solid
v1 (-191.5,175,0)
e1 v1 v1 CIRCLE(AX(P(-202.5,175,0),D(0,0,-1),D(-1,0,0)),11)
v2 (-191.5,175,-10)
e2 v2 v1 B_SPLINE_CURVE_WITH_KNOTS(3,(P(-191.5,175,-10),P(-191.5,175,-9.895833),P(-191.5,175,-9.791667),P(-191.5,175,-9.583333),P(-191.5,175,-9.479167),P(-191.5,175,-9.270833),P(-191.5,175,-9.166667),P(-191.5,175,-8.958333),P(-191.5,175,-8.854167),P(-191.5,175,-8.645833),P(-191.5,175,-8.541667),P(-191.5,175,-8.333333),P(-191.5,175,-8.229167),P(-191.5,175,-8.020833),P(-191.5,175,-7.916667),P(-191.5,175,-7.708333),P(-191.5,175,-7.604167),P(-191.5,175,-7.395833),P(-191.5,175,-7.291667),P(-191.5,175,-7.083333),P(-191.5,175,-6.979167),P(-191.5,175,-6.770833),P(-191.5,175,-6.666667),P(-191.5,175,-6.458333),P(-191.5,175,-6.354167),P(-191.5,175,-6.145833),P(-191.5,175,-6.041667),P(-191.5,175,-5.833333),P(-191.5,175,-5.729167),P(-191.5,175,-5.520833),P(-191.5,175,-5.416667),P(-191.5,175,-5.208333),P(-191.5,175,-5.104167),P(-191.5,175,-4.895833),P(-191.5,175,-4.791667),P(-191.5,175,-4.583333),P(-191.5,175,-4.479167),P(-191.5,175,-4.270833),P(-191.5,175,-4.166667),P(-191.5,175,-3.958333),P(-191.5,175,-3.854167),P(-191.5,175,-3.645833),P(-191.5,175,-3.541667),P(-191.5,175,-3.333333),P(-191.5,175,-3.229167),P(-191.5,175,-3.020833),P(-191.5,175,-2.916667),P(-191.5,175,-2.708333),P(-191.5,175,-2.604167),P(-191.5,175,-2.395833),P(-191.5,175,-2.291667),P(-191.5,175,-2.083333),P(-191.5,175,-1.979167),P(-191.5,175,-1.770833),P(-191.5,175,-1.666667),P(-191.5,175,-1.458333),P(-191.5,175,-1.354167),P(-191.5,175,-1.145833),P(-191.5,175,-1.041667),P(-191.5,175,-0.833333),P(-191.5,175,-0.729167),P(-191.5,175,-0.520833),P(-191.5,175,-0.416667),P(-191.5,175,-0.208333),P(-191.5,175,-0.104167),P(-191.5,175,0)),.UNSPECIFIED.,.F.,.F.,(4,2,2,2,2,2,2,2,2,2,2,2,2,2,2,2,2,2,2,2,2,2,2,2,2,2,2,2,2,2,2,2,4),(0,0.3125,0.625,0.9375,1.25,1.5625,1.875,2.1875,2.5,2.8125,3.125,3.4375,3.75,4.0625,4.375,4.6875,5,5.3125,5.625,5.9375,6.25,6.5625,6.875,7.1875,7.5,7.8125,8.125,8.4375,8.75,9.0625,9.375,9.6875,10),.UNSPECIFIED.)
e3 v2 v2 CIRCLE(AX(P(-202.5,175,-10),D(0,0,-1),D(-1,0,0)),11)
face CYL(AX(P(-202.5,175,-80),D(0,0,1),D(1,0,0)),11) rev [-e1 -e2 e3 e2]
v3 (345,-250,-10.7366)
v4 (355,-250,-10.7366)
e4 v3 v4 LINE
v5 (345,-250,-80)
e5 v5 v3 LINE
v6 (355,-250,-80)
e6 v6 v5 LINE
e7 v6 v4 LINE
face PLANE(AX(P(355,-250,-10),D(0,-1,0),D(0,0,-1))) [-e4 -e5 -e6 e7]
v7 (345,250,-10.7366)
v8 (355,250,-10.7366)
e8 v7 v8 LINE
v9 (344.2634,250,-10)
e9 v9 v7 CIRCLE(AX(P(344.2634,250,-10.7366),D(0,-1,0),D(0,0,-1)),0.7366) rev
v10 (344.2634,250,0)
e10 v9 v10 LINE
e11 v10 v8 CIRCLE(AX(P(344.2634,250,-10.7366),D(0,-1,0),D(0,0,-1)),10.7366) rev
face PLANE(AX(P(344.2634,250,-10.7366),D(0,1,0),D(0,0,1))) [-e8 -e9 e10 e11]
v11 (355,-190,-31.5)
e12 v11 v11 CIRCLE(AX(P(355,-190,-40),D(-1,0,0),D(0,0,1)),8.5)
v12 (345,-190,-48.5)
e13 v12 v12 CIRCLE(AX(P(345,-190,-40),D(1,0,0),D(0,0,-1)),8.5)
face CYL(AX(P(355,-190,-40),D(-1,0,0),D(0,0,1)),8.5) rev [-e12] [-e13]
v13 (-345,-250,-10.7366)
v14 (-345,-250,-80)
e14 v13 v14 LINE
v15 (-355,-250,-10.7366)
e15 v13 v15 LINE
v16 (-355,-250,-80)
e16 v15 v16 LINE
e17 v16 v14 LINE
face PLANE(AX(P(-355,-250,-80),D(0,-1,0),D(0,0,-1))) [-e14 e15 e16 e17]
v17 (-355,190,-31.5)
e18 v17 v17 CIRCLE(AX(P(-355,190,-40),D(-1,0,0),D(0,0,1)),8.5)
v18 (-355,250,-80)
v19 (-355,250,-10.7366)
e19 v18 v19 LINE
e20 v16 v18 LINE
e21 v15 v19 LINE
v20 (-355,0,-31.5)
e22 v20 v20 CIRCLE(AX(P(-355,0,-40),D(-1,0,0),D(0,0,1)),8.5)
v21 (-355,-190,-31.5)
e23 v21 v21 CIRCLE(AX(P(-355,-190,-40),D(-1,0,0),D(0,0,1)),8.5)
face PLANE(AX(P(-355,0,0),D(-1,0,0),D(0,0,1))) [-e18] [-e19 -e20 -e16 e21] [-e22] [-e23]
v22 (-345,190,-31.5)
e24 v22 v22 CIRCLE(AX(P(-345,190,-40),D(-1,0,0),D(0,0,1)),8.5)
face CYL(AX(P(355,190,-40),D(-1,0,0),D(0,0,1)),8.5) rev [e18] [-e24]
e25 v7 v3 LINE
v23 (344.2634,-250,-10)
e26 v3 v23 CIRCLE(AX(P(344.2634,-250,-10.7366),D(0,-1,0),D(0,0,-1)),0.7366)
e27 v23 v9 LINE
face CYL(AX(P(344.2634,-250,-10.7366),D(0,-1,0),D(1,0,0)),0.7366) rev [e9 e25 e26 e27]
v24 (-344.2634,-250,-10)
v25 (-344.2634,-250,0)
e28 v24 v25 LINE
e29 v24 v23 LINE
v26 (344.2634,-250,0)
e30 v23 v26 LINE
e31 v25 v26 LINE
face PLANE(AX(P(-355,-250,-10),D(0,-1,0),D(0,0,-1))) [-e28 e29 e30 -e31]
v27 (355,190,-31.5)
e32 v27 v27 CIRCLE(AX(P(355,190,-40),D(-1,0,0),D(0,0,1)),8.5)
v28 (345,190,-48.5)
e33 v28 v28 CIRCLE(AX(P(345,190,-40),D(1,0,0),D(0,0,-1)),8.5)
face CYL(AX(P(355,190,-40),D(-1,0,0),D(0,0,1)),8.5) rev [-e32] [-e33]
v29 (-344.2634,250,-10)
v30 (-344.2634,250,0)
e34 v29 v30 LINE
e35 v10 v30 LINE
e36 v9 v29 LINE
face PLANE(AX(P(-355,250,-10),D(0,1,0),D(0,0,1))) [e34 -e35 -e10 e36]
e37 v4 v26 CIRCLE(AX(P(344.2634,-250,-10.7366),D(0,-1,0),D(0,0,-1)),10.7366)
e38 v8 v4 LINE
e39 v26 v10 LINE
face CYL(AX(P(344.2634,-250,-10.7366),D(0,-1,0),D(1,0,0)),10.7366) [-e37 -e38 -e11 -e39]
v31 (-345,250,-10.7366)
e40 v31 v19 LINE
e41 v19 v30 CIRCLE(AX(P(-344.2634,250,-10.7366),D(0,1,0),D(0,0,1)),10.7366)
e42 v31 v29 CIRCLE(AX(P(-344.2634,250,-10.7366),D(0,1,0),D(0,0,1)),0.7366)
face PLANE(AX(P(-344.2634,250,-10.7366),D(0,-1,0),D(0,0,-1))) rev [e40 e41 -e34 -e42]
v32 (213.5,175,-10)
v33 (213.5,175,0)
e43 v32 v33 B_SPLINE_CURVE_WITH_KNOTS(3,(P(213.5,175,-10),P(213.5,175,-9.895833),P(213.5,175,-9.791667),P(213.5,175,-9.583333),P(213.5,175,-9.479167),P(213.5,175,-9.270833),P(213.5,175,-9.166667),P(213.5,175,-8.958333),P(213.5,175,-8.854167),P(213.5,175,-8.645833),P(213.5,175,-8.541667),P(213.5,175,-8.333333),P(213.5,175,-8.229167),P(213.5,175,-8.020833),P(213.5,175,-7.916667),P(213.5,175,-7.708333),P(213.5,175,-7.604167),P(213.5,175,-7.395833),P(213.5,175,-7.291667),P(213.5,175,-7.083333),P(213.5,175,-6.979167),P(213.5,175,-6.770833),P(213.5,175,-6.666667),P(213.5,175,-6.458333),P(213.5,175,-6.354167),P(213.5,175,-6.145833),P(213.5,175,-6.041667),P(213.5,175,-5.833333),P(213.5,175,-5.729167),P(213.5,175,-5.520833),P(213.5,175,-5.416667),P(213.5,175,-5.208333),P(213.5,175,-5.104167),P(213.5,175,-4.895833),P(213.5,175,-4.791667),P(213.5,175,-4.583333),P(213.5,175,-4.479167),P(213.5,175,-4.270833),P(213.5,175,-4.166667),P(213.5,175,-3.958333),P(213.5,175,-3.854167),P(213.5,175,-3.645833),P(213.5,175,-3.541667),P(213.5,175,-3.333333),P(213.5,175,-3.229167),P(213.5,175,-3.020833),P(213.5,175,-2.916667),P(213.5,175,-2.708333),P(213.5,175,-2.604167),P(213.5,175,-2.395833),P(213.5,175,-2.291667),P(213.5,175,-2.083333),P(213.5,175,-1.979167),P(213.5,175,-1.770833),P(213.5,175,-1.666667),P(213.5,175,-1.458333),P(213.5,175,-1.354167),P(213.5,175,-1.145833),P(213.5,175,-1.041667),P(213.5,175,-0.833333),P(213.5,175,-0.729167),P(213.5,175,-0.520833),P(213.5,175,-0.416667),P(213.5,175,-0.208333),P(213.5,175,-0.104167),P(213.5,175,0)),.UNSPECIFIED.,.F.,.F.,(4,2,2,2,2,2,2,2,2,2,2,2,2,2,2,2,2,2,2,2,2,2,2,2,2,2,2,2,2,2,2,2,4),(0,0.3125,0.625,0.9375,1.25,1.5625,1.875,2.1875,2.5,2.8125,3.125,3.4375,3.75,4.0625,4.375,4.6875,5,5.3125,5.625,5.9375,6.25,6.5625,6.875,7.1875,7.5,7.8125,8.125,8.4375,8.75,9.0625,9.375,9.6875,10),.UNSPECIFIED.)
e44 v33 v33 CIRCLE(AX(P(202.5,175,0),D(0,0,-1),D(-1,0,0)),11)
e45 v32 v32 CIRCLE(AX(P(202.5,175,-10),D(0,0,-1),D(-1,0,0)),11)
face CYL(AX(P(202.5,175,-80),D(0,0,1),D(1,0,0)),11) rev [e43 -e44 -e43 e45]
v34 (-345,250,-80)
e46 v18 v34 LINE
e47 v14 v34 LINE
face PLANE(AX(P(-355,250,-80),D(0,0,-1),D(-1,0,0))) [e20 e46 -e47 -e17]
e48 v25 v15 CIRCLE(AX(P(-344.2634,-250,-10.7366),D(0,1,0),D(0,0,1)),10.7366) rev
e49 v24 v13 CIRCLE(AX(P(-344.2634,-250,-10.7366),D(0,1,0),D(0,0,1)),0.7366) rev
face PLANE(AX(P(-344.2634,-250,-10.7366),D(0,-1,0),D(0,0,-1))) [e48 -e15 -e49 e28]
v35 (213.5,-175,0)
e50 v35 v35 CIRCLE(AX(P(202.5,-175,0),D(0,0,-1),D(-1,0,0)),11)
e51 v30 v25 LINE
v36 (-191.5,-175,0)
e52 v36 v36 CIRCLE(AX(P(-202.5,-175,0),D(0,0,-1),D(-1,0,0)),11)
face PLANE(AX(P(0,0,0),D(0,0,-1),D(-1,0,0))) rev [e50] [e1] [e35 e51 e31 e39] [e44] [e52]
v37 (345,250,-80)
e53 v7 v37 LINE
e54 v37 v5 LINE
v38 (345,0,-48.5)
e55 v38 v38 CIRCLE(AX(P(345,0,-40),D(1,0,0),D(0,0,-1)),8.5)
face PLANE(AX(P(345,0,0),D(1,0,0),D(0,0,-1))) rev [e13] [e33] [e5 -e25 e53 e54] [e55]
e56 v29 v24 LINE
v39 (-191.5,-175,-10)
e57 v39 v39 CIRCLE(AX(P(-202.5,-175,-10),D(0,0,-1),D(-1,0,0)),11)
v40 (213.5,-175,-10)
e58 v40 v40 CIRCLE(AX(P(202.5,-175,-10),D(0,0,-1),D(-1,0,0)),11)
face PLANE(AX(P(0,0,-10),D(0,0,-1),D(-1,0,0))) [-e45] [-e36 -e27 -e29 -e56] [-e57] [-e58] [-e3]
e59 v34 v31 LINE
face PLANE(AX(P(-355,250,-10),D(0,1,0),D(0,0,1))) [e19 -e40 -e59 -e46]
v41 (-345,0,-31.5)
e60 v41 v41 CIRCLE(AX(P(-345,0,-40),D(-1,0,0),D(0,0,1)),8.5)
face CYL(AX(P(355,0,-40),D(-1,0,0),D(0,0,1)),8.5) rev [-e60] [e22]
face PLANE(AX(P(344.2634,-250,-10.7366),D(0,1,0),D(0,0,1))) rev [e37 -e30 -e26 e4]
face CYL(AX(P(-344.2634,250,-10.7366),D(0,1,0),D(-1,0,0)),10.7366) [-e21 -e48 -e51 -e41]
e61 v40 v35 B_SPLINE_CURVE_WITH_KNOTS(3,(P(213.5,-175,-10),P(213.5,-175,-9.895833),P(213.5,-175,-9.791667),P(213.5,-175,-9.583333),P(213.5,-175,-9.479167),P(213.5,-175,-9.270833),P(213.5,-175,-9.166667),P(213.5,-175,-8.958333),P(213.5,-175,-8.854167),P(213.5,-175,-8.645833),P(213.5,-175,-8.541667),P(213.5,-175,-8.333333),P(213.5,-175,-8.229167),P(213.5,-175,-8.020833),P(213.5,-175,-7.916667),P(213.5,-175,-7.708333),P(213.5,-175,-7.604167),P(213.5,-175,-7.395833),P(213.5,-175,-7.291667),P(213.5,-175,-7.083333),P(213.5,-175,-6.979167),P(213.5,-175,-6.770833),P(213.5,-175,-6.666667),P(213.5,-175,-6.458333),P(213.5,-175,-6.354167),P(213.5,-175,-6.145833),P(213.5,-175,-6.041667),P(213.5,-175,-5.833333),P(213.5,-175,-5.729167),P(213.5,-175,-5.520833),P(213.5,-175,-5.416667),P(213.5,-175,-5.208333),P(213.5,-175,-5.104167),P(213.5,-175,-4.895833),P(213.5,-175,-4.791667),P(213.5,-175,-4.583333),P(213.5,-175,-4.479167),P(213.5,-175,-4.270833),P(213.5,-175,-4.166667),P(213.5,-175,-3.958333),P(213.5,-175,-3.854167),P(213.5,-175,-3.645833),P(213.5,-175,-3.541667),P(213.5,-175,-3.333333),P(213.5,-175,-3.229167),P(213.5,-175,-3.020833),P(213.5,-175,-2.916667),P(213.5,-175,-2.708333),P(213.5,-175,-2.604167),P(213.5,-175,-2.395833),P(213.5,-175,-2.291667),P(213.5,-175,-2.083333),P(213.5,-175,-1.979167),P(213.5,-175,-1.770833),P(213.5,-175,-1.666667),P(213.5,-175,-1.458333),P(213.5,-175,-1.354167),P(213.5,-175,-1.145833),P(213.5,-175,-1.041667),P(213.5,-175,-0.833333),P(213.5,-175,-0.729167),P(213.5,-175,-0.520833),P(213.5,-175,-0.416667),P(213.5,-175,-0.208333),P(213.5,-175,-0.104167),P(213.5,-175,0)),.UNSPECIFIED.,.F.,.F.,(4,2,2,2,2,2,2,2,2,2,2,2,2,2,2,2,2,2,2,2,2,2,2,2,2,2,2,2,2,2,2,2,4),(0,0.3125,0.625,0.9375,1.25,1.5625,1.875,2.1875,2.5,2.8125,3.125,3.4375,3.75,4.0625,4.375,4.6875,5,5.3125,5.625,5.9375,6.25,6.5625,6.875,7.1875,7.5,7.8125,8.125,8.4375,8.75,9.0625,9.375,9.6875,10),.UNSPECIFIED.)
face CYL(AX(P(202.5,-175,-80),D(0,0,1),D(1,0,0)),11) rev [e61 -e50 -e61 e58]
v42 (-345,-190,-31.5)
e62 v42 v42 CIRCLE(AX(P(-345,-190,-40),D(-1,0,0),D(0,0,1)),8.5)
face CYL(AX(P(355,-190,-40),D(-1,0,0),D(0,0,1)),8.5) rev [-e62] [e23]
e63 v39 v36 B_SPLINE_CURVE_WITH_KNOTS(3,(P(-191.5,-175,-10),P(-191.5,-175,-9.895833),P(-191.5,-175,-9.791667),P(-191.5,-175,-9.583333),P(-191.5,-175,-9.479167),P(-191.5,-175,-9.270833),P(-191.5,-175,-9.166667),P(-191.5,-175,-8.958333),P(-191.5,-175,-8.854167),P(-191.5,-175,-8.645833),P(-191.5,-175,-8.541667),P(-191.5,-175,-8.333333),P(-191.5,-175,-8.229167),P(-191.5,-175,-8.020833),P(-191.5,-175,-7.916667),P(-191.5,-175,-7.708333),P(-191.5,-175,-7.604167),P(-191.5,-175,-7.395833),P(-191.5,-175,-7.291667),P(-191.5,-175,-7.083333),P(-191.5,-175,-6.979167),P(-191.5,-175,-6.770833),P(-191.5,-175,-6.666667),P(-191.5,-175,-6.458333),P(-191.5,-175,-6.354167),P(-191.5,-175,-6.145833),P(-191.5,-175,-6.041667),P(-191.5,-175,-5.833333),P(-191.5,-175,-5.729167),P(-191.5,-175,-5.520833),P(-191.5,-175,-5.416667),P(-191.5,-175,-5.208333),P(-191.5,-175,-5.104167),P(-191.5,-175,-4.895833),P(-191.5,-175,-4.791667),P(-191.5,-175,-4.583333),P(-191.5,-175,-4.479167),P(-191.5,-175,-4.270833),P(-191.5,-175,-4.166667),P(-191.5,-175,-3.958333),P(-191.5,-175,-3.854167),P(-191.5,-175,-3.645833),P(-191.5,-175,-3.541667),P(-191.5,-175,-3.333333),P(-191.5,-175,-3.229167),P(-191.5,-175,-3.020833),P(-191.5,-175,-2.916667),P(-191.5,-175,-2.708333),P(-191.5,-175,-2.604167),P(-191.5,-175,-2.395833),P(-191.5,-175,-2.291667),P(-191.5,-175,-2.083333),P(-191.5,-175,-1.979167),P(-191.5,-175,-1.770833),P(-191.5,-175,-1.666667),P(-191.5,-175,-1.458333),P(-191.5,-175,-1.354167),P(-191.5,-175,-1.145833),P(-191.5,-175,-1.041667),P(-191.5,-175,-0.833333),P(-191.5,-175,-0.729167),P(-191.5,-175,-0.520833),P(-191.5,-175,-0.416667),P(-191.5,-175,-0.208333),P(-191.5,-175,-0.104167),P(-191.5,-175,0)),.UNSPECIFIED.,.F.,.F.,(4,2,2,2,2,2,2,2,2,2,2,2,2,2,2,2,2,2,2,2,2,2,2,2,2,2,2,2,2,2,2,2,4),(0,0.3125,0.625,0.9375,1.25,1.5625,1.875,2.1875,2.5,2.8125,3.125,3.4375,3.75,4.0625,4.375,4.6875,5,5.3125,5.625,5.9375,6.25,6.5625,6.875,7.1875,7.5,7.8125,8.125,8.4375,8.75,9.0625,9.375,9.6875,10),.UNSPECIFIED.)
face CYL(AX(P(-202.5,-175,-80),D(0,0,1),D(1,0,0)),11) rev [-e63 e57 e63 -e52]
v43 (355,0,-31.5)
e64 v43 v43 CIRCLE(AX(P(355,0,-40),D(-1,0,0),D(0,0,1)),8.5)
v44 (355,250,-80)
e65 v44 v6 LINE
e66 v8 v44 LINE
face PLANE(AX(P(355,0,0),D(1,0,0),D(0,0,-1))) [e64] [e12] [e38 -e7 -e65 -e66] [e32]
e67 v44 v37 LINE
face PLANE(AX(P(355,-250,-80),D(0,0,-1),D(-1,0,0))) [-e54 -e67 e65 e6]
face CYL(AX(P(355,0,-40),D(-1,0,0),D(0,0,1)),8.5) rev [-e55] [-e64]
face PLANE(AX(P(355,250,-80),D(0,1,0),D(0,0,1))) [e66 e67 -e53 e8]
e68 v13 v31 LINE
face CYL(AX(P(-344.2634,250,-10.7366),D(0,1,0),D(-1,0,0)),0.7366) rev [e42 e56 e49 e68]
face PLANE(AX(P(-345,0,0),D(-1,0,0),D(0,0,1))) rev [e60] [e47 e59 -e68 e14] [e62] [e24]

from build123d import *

# Parameters (mm, degrees)
SKETCH1_W                    = 710
SKETCH1_H                    = 500
BASE_FLANGE1_DEPTH           = 10
EDGE_FLANGE1_STRIP_W         = 41.4732
EDGE_FLANGE1_STRIP_H         = 10
EDGE_FLANGE1_STRIP_CUT_DEPTH = 500
EDGE_FLANGE1_DEPTH           = 500
EDGE_FLANGE2_STRIP_W         = 41.4732
EDGE_FLANGE2_STRIP_H         = 10
EDGE_FLANGE2_STRIP_CUT_DEPTH = 500
EDGE_FLANGE2_DEPTH           = 500
SKETCH12_R                   = 8.5
CUT_EXTRUDE1_DEPTH           = 757.967634711
LPATTERN1_COUNT              = 3
LPATTERN1_PITCH              = 190
SKETCH13_R                   = 11
CUT_EXTRUDE2_DEPTH           = 442.503114372
LPATTERN2_COUNT              = 2
LPATTERN2_PITCH              = 405
LPATTERN2_COUNT_DIR2         = 2
LPATTERN2_PITCH_DIR2         = 350


# Sheet-metal steps are written as plain solids
with BuildPart() as part:
    # Sketch1 → Base-Flange1 (new body)
    with BuildSketch(Plane.XY):
        Rectangle(SKETCH1_W, SKETCH1_H)
    extrude(amount=-BASE_FLANGE1_DEPTH)

    # Edge-Flange1 strip (across the edge) → Edge-Flange1 strip cut (cut)
    with BuildSketch(Plane(origin=(-355, -250, -10), x_dir=(1, 0, 0), z_dir=(0, 1, 0))):
        with Locations((-10, -5)):
            Rectangle(EDGE_FLANGE1_STRIP_W, EDGE_FLANGE1_STRIP_H)
    extrude(amount=EDGE_FLANGE1_STRIP_CUT_DEPTH, mode=Mode.SUBTRACT)

    # Edge-Flange1 section (across the edge) → Edge-Flange1 (add)
    with BuildSketch(Plane(origin=(-355, -250, -10), x_dir=(1, 0, 0), z_dir=(0, 1, 0))):
        with BuildLine():
            Line((0, 0.7366), (0, 70))
            Line((0, 70), (10, 70))
            Line((10, 70), (10, 0.7366))
            ThreePointArc((10, 0.7366), (10.215745145, 0.215745145), (10.7366, 0))
            Line((10.7366, 0), (10.7366, -10))
            ThreePointArc((10.7366, -10), (3.144677333, -6.855322667), (0, 0.7366))
        make_face()
    extrude(amount=EDGE_FLANGE1_DEPTH)

    # Edge-Flange2 strip (across the edge) → Edge-Flange2 strip cut (cut)
    with BuildSketch(Plane(origin=(355, 250, -10), x_dir=(-1, 0, 0), z_dir=(0, -1, 0))):
        with Locations((-10, -5)):
            Rectangle(EDGE_FLANGE2_STRIP_W, EDGE_FLANGE2_STRIP_H)
    extrude(amount=EDGE_FLANGE2_STRIP_CUT_DEPTH, mode=Mode.SUBTRACT)

    # Edge-Flange2 section (across the edge) → Edge-Flange2 (add)
    with BuildSketch(Plane(origin=(355, 250, -10), x_dir=(-1, 0, 0), z_dir=(0, -1, 0))):
        with BuildLine():
            Line((0, 0.7366), (0, 70))
            Line((0, 70), (10, 70))
            Line((10, 70), (10, 0.7366))
            ThreePointArc((10, 0.7366), (10.215745145, 0.215745145), (10.7366, 0))
            Line((10.7366, 0), (10.7366, -10))
            ThreePointArc((10.7366, -10), (3.144677333, -6.855322667), (0, 0.7366))
        make_face()
    extrude(amount=EDGE_FLANGE2_DEPTH)

    # Sketch12 → Cut-Extrude1 (cut, symmetric)
    with BuildSketch(Plane.ZY.offset(355)):
        with Locations((-40, 190)):
            Circle(SKETCH12_R)
    cut_extrude1 = extrude(amount=CUT_EXTRUDE1_DEPTH, both=True, mode=Mode.SUBTRACT)

    # LPattern1: Cut-Extrude1 ×3
    with Locations(*[(0, -i * LPATTERN1_PITCH, 0) for i in range(1, LPATTERN1_COUNT)]):
        add(cut_extrude1, mode=Mode.SUBTRACT)

    # Sketch13 → Cut-Extrude2 (cut, symmetric)
    with BuildSketch(Plane.XY):
        with Locations((202.5, 175)):
            Circle(SKETCH13_R)
    cut_extrude2 = extrude(amount=CUT_EXTRUDE2_DEPTH, both=True, mode=Mode.SUBTRACT)

    # LPattern2: Cut-Extrude2 2 × 2
    with Locations(*[(-i * LPATTERN2_PITCH, -j * LPATTERN2_PITCH_DIR2, 0) for i in range(LPATTERN2_COUNT) for j in range(LPATTERN2_COUNT_DIR2) if (i, j) != (0, 0)]):
        add(cut_extrude2, mode=Mode.SUBTRACT)


solid = part.part
